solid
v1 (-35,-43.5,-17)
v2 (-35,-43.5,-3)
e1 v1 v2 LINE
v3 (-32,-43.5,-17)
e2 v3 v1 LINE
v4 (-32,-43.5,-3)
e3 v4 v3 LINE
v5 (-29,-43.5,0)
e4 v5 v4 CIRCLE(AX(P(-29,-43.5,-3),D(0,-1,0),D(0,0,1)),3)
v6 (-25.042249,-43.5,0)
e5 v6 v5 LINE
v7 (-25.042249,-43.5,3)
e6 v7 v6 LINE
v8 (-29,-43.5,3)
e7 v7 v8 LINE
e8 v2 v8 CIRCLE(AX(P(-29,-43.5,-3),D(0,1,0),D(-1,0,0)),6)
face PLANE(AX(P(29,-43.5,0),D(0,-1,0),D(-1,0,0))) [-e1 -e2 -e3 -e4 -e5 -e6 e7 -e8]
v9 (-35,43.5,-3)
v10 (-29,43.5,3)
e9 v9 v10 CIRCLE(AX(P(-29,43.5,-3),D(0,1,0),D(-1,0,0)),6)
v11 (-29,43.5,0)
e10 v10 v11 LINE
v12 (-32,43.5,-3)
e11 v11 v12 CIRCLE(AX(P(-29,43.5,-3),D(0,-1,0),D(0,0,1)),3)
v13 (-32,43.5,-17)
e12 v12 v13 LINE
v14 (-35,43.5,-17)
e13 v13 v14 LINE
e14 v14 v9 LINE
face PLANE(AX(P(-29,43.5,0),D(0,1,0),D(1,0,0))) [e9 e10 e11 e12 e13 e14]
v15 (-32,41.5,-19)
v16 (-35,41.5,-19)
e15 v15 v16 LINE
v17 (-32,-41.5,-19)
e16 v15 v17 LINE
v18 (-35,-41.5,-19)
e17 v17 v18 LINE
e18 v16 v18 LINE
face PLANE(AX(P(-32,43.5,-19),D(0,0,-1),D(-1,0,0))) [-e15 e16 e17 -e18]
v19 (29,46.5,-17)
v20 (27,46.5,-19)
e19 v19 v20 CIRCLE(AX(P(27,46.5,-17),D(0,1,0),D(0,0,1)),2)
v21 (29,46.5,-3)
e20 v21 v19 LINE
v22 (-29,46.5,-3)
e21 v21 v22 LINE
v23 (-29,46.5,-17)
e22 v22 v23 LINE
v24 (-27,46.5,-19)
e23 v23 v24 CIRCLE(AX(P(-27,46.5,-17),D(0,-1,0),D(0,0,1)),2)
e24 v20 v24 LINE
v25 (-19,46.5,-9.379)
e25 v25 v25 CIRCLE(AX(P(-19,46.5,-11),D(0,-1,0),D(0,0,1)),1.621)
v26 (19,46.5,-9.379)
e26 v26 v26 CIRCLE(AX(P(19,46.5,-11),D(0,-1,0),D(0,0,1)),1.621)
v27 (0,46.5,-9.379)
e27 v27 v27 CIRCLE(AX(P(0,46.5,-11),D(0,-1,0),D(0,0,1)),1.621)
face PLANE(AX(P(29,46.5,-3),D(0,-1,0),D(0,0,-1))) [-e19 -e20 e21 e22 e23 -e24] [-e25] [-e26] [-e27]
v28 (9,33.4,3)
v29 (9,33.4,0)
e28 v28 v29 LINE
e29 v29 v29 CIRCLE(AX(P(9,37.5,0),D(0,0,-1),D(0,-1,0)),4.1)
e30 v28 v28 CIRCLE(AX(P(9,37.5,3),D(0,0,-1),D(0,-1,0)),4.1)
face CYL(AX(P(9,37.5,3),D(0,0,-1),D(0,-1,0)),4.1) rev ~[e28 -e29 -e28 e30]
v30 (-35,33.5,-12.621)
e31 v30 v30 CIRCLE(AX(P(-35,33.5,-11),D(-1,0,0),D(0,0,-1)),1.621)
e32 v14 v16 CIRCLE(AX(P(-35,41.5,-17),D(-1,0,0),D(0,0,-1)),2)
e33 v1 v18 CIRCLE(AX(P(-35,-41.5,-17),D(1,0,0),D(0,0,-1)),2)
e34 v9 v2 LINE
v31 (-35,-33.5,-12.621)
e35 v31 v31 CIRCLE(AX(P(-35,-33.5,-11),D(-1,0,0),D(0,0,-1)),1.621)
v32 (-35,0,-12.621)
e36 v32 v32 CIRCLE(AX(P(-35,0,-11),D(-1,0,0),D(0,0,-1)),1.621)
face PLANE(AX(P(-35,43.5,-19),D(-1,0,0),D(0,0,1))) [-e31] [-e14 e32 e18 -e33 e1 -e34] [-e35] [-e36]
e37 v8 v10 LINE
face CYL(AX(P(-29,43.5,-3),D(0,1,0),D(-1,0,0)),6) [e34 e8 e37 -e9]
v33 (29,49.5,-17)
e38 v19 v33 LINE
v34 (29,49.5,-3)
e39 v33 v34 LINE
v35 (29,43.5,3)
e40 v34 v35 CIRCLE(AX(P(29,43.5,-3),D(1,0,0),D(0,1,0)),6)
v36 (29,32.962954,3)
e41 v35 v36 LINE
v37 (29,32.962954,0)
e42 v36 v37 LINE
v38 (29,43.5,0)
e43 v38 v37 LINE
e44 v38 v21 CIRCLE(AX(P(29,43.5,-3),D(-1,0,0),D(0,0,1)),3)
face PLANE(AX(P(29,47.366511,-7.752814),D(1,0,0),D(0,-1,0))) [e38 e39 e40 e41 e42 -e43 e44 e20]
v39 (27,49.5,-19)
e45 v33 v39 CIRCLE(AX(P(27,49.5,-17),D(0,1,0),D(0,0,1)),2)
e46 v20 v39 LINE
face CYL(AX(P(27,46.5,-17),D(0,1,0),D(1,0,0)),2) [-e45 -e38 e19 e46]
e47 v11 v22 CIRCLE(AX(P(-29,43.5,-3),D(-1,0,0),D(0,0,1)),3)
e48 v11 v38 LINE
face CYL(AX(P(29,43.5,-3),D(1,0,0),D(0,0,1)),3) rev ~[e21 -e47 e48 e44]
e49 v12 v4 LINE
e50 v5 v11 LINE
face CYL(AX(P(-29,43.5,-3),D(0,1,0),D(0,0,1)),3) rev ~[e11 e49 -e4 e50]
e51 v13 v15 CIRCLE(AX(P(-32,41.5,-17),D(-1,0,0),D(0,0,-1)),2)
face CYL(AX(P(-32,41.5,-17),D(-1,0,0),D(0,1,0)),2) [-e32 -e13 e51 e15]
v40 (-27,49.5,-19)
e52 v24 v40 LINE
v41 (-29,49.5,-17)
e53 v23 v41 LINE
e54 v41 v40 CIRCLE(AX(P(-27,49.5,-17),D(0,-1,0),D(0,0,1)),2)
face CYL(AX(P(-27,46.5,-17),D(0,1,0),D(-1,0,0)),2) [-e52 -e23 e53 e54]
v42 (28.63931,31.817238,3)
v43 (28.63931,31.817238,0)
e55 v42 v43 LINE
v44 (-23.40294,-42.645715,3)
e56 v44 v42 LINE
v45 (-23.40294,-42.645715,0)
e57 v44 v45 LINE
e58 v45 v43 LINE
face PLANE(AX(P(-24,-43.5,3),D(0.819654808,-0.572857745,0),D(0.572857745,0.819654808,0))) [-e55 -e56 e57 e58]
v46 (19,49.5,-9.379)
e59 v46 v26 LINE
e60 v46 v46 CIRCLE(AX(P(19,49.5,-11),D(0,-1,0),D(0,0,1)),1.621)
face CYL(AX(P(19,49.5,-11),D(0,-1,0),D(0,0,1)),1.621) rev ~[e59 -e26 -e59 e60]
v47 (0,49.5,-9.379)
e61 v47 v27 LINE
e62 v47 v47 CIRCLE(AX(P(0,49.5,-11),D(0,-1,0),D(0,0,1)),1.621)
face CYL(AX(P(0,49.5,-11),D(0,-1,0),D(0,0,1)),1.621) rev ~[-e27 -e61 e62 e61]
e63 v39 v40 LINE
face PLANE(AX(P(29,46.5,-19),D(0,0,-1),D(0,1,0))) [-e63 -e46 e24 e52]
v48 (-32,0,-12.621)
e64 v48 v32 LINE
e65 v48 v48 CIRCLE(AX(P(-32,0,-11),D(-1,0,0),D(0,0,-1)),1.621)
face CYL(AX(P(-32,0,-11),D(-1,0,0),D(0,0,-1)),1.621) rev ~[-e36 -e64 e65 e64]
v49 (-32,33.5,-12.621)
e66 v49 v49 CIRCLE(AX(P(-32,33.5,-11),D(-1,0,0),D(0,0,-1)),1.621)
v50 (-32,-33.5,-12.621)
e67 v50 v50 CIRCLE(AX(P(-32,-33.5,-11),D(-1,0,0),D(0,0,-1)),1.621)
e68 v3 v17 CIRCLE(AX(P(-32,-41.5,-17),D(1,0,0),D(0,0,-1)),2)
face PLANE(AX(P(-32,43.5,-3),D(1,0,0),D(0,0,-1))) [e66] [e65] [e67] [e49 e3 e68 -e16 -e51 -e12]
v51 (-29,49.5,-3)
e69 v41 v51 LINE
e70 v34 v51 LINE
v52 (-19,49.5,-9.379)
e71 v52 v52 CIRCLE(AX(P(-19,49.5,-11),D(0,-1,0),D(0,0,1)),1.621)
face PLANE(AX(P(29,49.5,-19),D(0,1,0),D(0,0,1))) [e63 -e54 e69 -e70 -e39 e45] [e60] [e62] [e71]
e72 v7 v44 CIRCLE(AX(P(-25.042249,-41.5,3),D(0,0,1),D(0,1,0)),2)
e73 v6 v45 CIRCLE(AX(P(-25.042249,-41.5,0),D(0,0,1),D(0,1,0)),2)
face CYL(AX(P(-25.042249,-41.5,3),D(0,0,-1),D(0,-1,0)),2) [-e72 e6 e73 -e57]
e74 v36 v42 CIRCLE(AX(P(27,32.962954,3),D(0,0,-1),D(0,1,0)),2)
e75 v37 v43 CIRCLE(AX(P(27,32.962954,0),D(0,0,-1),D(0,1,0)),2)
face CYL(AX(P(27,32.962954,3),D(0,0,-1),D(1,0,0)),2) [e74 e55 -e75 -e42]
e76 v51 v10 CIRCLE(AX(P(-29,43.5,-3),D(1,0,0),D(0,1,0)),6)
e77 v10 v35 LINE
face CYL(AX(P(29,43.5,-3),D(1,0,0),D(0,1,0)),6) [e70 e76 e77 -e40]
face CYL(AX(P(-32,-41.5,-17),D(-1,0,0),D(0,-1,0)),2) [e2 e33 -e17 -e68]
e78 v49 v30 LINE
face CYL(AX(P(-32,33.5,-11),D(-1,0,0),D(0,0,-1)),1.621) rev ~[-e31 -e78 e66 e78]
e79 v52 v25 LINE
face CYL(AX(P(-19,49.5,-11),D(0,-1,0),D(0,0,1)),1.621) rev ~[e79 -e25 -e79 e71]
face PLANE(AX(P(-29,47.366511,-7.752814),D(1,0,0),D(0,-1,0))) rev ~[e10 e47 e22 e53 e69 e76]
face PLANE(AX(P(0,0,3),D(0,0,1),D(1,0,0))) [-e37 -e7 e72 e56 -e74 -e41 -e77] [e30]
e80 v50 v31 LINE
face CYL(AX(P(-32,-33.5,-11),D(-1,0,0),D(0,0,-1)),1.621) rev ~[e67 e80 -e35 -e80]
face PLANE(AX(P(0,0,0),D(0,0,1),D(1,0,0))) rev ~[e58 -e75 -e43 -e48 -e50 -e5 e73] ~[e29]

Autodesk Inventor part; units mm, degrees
ref_plane "YZ Plane" through (0, 0, 0) normal (1, 0, 0) x (0, 1, 0)
ref_plane "XZ Plane" through (0, 0, 0) normal (0, 1, 0) x (-1, 0, 0)
ref_plane "XY Plane" through (0, 0, 0) normal (0, 0, 1) x (1, 0, 0)
sketch "スケッチ1" plane through (0, 0, 0) normal (0, 0, 1) x (1, 0, 0)
  line L0 (29, -43.5) -> (-29, -43.5)
  line L1 (-29, -43.5) -> (-29, 43.5)
  line L2 (-29, 43.5) -> (29, 43.5)
  line L3 (29, 43.5) -> (29, -43.5)
  line L4 (29, -43.5) -> (-29, 43.5) construction
  line L5 (-29, -43.5) -> (29, 43.5) construction
  point P0 (0, 0)
  dimension "d0" = 87
  dimension "d1" = 58
extrude "プレート1" add sketch "スケッチ1" along normal blind 3
sketch "スケッチ2" plane through (-32, 43.5, -3) normal (-1, 0, 0) x (0, -1, 0)
  line L0 (87, 0) -> (0, 0)
  line L1 (0, 0) -> (0, -16)
  line L2 (0, -16) -> (87, -16)
  line L3 (87, -16) -> (87, 0)
edge flange "フランジ1" height 22 angle 90 thickness 3 bend radius 3 thickness toward (-1, 0, 0) relief tear relief width 3 relief depth 1.5 edges at (-29, 0, 0) wall of the first edge with corners at (-32, -43.5, -3) (-32, 43.5, -3) (-32, 43.5, -19) (-32, -43.5, -19)
bend "曲げ1"
corner "コーナー1"
sketch "スケッチ3" plane through (29, 46.5, -3) normal (0, 1, 0) x (-1, 0, 0)
  line L0 (58, 0) -> (0, 0)
  line L1 (0, 0) -> (0, -16)
  line L2 (0, -16) -> (58, -16)
  line L3 (58, -16) -> (58, 0)
edge flange "フランジ2" height 22 angle 90 thickness 3 bend radius 3 thickness toward (0, 1, 0) relief tear relief width 3 relief depth 1.5 edges at (0, 43.5, 0) wall of the first edge with corners at (-29, 46.5, -3) (29, 46.5, -3) (29, 46.5, -19) (-29, 46.5, -19)
bend "曲げ2"
corner "コーナー2"
sketch "スケッチ4" plane through (0, 0, 3) normal (0, 0, 1) x (1, 0, 0)
  line L0 (29, -43.5) -> (-29, -43.5) projected
  line L1 (-24, -43.5) -> (33.3099, 38.5)
  line L2 (-29, -43.5) -> (-29, 43.5) projected
  line L3 (-29, 43.5) -> (29, 43.5) projected
  line L4 (-29, -43.5) -> (-29, 43.5) projected
  line L5 (29, -43.5) -> (-29, -43.5) projected
  line L6 (29, 43.5) -> (29, -43.5) projected
  line L7 (-29, 43.5) -> (29, 43.5) projected
  point P0 (0, 0)
  point P1 (29, 32.3333)
  dimension "d23" = 5
  dimension "d24" = 5
extrude "押し出し1" cut sketch "スケッチ4" against normal through all contours L0 L1 L6
fillet "フィレット1" radius 2 6 edges at (-24, -43.5, 1.5) (-33.5, -43.5, -19) (29, 32.3333, 1.5) (29, 48, -19) (-33.5, 43.5, -19) (-29, 48, -19)
sketch "スケッチ5" plane through (-32, -43.5, -3) normal (1, 0, 0) x (0, 0, -1)
  arc A0 (16, 85) -> (14, 87) centre (14, 85) ccw projected
  line L0 (14, 87) -> (0, 87) projected
  line L1 (0, 87) -> (0, 0) projected
  line L2 (14, 0) -> (0, 0) projected
  arc A1 (14, 0) -> (16, 2) centre (14, 2) ccw projected
  line L3 (16, 2) -> (16, 85) projected
  point P0 (-3, 43.5)
  point P1 (8, 77)
  point P2 (8, 10)
  point P3 (8, 43.5)
  dimension "d28" = 8
  dimension "d29" = 10
  dimension "d30" = 10
  dimension "d31" = 33.5
hole "穴1" at (-32, 33.5, -11) at (-32, -33.5, -11) at (-32, 0, -11) direction (-1, 0, 0) diameter 3.242 end through all thread size "M4x0.7" class "6H" standard "ISO Metric profile"
sketch "スケッチ6" plane through (-29, 49.5, -3) normal (0, 1, 0) x (1, 0, 0)
  line L0 (10, 8) -> (48, 8)
  line L1 (2, 16) -> (56, 16) projected
  line L2 (58, 14) -> (58, 0) projected
  line L3 (0, 0) -> (0, 14) projected
  point P0 (29, -3)
  point P1 (29, 8)
  dimension "d39" = 8
  dimension "d40" = 10
  dimension "d41" = 10
hole "穴2" at (0, 49.5, -11) at (19, 49.5, -11) at (-19, 49.5, -11) direction (0, -1, 0) diameter 3.242 end through all thread size "M4x0.7" class "6H" standard "ISO Metric profile"
sketch "スケッチ8" plane through (0, 0, 3) normal (0, 0, 1) x (1, 0, 0)
  line L0 (-29, 49.5) -> (29, 49.5) projected
  line L1 (29, 43.5) -> (29, 32.9629) projected
  point P0 (0, 0)
  point P1 (9, 37.5)
  dimension "d54" = 12
  dimension "d55" = 20
hole "穴3" at (9, 37.5, 3) direction (0, 0, -1) diameter 8.2 end through all
equation "\"d61\" = Thickness"
equation "\"d2\" = Thickness"
equation "\"d3\" = BendReliefWidth"
equation "\"d4\" = BendReliefDepth"
equation "\"d5\" = MinimumRemnant"
equation "\"d6\" = TransitionRadius"
equation "\"d9\" = BendRadius"
equation "\"d10\" = CornerReliefSize"
equation "\"d11\" = GapSize"
equation "\"d12\" = JacobiRadiusSize"
equation "\"d13\" = BendReliefWidth"
equation "\"d14\" = BendReliefDepth"
equation "\"d15\" = MinimumRemnant"
equation "\"d16\" = TransitionRadius"
equation "\"d19\" = BendRadius"
equation "\"d20\" = CornerReliefSize"
equation "\"d21\" = GapSize"
equation "\"d22\" = JacobiRadiusSize"
equation "\"BendRadius\" = Thickness"
equation "\"BendReliefWidth\" = Thickness"
equation "\"BendReliefDepth\" = 0.5 * Thickness"
equation "\"CornerReliefSize\" = 4 * Thickness"
equation "\"MinimumRemnant\" = 2 * Thickness"
equation "\"TransitionRadius\" = BendRadius"
equation "\"JacobiRadiusSize\" = BendRadius"
equation "\"GapSize\" = Thickness"
equation "\"Thickness\" = 3"
properties part number "CCM_Mount_C"
